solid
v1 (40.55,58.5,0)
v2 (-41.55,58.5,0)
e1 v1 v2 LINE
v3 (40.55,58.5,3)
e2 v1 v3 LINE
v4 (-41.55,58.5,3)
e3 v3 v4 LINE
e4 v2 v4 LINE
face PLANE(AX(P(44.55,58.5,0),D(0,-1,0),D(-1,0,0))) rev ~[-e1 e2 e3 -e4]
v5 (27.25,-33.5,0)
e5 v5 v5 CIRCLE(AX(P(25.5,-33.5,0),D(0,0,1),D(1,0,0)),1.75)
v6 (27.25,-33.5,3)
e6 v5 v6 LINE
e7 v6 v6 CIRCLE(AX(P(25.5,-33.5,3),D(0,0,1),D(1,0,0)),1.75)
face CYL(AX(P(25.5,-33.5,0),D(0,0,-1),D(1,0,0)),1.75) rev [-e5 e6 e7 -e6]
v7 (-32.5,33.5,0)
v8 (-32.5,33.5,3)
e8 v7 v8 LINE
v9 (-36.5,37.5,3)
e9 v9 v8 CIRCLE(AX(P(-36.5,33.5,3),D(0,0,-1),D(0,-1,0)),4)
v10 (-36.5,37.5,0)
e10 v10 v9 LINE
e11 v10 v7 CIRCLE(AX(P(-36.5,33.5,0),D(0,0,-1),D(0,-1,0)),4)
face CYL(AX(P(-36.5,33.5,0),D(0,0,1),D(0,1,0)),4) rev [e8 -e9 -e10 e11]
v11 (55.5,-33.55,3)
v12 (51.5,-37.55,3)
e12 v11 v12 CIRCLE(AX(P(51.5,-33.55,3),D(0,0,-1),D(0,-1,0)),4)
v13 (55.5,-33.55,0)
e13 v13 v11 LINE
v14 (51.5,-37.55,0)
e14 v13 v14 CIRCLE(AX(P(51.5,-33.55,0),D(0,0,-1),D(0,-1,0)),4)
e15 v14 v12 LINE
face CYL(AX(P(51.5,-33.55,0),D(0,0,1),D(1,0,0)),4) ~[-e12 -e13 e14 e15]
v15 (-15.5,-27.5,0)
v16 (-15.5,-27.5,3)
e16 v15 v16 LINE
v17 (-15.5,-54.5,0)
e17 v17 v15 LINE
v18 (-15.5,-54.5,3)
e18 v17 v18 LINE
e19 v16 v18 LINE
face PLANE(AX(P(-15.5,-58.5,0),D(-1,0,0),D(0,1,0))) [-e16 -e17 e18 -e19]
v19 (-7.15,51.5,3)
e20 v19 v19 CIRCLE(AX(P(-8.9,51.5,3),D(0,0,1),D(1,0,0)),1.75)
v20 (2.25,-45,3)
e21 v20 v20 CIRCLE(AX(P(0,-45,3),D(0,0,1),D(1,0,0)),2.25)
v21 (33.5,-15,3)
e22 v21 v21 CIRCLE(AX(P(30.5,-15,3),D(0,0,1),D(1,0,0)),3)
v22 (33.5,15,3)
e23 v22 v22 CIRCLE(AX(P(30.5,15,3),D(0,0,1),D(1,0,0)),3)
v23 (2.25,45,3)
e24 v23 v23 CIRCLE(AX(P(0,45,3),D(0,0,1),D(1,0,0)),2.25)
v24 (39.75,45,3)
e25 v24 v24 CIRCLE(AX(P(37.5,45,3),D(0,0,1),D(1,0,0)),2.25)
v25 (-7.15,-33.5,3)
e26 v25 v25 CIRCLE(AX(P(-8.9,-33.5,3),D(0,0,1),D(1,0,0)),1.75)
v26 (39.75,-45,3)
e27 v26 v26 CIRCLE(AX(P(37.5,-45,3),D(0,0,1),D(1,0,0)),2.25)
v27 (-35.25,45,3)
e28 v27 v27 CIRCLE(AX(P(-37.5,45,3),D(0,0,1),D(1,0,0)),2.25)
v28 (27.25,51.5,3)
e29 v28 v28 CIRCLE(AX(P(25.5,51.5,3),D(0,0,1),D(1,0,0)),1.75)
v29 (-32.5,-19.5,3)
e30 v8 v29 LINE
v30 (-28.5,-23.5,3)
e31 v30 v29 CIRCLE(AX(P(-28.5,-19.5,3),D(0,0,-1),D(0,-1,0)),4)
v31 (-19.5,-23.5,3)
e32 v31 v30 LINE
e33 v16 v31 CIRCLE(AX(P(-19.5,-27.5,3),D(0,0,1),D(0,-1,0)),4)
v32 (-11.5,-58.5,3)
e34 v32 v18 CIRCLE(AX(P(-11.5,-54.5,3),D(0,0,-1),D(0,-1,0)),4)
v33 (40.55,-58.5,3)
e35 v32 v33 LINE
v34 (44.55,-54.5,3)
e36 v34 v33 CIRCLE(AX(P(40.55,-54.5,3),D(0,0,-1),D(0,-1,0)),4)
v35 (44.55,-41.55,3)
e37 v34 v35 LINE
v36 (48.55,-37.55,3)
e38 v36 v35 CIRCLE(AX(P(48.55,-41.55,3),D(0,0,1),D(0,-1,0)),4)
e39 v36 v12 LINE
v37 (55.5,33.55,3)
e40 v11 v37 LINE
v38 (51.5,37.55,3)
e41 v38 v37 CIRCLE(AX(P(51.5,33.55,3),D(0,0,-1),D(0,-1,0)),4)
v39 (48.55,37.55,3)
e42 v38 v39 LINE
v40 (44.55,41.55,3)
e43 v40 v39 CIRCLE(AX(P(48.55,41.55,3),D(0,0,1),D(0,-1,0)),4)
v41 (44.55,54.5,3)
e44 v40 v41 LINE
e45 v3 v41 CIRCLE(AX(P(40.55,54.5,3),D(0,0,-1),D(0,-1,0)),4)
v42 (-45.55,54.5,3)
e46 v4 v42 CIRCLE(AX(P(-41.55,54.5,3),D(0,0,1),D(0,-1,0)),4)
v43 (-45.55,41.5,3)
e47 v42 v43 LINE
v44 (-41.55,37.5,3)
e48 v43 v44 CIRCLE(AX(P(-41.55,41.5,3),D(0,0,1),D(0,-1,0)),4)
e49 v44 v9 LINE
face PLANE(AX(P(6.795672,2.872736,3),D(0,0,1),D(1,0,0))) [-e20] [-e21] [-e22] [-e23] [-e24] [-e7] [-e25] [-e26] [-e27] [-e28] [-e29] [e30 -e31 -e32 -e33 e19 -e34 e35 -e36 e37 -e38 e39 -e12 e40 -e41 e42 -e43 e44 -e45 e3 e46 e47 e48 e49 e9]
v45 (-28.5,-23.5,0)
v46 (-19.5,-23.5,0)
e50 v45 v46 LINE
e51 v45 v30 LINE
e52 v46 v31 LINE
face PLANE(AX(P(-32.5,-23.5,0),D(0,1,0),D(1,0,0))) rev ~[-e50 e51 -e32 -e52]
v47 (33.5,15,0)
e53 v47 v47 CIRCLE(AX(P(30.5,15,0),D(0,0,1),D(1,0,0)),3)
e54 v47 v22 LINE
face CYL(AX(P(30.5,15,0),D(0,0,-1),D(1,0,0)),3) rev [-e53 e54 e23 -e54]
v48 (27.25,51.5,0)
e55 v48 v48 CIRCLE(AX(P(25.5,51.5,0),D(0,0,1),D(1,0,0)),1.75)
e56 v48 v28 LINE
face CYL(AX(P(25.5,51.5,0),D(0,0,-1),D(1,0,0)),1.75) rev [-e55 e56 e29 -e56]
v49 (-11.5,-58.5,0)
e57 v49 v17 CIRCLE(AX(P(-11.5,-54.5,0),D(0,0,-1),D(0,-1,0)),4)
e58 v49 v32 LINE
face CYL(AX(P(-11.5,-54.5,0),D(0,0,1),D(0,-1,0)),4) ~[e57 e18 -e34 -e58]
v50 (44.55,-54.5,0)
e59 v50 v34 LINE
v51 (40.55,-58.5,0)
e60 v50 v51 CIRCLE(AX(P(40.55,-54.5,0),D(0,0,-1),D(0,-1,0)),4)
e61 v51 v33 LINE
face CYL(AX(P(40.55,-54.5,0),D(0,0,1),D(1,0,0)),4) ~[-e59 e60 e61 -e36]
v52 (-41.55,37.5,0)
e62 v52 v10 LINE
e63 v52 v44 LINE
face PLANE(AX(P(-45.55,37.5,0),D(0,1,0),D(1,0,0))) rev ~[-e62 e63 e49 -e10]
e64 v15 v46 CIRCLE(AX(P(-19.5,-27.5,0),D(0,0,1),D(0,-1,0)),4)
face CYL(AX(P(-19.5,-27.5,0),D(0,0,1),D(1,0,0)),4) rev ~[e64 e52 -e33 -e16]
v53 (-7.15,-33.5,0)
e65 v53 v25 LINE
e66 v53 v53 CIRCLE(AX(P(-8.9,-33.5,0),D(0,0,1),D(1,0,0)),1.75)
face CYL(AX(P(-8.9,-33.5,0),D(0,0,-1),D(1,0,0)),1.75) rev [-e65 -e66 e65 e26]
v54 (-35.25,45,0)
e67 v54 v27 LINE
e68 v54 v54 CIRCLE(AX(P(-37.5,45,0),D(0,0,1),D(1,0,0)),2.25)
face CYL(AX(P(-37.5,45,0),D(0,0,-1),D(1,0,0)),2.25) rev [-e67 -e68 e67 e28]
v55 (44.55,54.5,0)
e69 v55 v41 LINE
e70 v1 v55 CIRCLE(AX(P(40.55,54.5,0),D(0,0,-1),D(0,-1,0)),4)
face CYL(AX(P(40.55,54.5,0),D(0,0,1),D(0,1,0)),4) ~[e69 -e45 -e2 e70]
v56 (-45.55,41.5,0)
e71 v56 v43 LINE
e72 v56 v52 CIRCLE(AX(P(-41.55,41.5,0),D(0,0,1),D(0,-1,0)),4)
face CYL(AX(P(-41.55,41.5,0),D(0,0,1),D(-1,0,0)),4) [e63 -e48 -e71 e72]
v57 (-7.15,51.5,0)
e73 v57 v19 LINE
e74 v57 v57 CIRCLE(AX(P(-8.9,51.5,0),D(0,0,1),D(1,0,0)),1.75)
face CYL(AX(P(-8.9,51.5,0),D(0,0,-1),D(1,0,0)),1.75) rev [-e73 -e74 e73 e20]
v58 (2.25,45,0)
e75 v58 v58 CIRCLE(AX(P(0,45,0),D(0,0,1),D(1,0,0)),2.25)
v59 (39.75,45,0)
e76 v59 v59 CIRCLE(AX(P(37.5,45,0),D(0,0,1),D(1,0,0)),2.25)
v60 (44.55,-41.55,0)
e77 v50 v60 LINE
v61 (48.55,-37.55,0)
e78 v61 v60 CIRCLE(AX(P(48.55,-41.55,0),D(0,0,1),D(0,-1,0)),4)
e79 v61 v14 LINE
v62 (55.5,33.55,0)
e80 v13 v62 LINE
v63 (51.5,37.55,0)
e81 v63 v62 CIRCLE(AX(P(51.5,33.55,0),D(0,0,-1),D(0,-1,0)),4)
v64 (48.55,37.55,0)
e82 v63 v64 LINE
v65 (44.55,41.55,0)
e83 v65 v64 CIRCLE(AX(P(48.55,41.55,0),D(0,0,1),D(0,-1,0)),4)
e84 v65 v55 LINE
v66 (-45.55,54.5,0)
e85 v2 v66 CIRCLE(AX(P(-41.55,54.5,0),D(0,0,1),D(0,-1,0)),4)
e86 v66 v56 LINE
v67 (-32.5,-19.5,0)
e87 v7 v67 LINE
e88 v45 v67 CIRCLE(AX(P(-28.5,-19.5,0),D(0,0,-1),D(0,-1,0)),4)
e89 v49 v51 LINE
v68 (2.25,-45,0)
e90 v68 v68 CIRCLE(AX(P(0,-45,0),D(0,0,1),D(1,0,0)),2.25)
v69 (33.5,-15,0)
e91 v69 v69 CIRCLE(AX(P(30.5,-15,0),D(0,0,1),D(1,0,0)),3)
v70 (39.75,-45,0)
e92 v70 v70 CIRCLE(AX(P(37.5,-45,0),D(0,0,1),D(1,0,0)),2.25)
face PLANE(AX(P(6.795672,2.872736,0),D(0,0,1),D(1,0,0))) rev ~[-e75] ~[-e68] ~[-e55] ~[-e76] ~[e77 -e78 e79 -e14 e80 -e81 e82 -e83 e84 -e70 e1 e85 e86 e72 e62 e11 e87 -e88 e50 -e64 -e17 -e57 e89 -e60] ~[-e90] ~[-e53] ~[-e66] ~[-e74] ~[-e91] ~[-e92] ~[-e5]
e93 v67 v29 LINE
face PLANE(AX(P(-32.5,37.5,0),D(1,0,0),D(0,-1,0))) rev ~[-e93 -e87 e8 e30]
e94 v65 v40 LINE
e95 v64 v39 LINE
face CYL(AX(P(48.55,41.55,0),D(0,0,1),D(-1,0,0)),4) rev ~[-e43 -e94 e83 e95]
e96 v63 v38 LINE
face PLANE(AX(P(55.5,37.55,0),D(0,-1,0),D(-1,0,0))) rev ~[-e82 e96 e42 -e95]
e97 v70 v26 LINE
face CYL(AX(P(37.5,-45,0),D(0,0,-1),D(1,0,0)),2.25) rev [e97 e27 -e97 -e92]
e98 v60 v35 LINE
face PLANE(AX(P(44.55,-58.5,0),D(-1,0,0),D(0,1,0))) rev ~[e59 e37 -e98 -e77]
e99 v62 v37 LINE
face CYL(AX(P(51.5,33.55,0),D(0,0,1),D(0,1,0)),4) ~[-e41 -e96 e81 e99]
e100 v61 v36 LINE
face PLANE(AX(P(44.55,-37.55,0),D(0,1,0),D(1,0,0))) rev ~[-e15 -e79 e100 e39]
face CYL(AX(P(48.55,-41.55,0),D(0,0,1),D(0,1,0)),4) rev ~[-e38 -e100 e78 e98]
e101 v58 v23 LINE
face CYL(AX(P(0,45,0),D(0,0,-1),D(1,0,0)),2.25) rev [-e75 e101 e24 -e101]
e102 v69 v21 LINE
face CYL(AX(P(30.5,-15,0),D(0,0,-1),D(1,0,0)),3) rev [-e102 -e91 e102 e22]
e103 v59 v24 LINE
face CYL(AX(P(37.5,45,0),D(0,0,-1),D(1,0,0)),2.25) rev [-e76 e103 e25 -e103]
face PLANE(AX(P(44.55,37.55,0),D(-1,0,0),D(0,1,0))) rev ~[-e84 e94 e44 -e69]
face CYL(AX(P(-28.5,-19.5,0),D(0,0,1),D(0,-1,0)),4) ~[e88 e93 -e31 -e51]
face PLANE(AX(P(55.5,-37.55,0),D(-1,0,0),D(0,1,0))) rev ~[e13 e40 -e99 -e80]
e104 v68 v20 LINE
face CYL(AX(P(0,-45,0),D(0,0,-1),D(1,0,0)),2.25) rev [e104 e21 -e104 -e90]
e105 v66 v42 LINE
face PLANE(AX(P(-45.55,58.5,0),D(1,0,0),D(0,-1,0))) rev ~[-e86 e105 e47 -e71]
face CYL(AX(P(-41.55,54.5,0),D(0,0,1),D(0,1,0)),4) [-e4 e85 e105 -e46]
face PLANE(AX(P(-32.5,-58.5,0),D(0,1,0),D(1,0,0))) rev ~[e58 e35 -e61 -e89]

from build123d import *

# Parameters (mm, degrees)
F1_R     = 2.25
F1_R_2   = 1.75
F1_R_3   = 3
F2_DEPTH = 3
F3_W     = 17
F3_H     = 35
F4_DEPTH = 3.001
F5_R     = 4


with BuildPart() as f2:
    # F1 (on Top) → F2 (new body)
    with BuildSketch(Plane.XY):
        Polygon((44.55, 58.5), (-32.5, 58.5), (-45.55, 58.5), (-45.55, 37.5), (-32.5, 37.5), (-32.5, 0), (-32.5, -58.5), (44.55, -58.5), (44.55, -37.55), (55.5, -37.55), (55.5, 37.55), (44.55, 37.55), align=None)
        with Locations((0, -45)):
            Circle(F1_R, mode=Mode.SUBTRACT)
        with Locations((-8.9, -33.5)):
            Circle(F1_R_2, mode=Mode.SUBTRACT)
        with Locations((25.5, -33.5)):
            Circle(F1_R_2, mode=Mode.SUBTRACT)
        with Locations((37.5, -45)):
            Circle(F1_R, mode=Mode.SUBTRACT)
        with Locations((30.5, -15)):
            Circle(F1_R_3, mode=Mode.SUBTRACT)
        with Locations((-37.5, 45)):
            Circle(F1_R, mode=Mode.SUBTRACT)
        with Locations((-8.9, 51.5)):
            Circle(F1_R_2, mode=Mode.SUBTRACT)
        with Locations((0, 45)):
            Circle(F1_R, mode=Mode.SUBTRACT)
        with Locations((30.5, 15)):
            Circle(F1_R_3, mode=Mode.SUBTRACT)
        with Locations((25.5, 51.5)):
            Circle(F1_R_2, mode=Mode.SUBTRACT)
        with Locations((37.5, 45)):
            Circle(F1_R, mode=Mode.SUBTRACT)
    extrude(amount=F2_DEPTH)

    # F3 (on Top) → F4 (cut, through all)
    with BuildSketch(Plane.XY):
        with Locations((-24, -41)):
            Rectangle(F3_W, F3_H)
    extrude(amount=F4_DEPTH, mode=Mode.SUBTRACT)

    # F5
    f5_edges = [f2.edges().sort_by_distance(p)[0] for p in [
        (-45.55, 37.5, 1.5),
        (-45.55, 58.5, 1.5),
        (-32.5, 37.5, 1.5),
        (-32.5, -23.5, 1.5),
        (-15.5, -58.5, 1.5),
        (-15.5, -23.5, 1.5),
        (44.55, -58.5, 1.5),
        (44.55, -37.55, 1.5),
        (55.5, -37.55, 1.5),
        (55.5, 37.55, 1.5),
        (44.55, 37.55, 1.5),
        (44.55, 58.5, 1.5),
    ]]
    fillet(f5_edges, radius=F5_R)


solid = f2.part
